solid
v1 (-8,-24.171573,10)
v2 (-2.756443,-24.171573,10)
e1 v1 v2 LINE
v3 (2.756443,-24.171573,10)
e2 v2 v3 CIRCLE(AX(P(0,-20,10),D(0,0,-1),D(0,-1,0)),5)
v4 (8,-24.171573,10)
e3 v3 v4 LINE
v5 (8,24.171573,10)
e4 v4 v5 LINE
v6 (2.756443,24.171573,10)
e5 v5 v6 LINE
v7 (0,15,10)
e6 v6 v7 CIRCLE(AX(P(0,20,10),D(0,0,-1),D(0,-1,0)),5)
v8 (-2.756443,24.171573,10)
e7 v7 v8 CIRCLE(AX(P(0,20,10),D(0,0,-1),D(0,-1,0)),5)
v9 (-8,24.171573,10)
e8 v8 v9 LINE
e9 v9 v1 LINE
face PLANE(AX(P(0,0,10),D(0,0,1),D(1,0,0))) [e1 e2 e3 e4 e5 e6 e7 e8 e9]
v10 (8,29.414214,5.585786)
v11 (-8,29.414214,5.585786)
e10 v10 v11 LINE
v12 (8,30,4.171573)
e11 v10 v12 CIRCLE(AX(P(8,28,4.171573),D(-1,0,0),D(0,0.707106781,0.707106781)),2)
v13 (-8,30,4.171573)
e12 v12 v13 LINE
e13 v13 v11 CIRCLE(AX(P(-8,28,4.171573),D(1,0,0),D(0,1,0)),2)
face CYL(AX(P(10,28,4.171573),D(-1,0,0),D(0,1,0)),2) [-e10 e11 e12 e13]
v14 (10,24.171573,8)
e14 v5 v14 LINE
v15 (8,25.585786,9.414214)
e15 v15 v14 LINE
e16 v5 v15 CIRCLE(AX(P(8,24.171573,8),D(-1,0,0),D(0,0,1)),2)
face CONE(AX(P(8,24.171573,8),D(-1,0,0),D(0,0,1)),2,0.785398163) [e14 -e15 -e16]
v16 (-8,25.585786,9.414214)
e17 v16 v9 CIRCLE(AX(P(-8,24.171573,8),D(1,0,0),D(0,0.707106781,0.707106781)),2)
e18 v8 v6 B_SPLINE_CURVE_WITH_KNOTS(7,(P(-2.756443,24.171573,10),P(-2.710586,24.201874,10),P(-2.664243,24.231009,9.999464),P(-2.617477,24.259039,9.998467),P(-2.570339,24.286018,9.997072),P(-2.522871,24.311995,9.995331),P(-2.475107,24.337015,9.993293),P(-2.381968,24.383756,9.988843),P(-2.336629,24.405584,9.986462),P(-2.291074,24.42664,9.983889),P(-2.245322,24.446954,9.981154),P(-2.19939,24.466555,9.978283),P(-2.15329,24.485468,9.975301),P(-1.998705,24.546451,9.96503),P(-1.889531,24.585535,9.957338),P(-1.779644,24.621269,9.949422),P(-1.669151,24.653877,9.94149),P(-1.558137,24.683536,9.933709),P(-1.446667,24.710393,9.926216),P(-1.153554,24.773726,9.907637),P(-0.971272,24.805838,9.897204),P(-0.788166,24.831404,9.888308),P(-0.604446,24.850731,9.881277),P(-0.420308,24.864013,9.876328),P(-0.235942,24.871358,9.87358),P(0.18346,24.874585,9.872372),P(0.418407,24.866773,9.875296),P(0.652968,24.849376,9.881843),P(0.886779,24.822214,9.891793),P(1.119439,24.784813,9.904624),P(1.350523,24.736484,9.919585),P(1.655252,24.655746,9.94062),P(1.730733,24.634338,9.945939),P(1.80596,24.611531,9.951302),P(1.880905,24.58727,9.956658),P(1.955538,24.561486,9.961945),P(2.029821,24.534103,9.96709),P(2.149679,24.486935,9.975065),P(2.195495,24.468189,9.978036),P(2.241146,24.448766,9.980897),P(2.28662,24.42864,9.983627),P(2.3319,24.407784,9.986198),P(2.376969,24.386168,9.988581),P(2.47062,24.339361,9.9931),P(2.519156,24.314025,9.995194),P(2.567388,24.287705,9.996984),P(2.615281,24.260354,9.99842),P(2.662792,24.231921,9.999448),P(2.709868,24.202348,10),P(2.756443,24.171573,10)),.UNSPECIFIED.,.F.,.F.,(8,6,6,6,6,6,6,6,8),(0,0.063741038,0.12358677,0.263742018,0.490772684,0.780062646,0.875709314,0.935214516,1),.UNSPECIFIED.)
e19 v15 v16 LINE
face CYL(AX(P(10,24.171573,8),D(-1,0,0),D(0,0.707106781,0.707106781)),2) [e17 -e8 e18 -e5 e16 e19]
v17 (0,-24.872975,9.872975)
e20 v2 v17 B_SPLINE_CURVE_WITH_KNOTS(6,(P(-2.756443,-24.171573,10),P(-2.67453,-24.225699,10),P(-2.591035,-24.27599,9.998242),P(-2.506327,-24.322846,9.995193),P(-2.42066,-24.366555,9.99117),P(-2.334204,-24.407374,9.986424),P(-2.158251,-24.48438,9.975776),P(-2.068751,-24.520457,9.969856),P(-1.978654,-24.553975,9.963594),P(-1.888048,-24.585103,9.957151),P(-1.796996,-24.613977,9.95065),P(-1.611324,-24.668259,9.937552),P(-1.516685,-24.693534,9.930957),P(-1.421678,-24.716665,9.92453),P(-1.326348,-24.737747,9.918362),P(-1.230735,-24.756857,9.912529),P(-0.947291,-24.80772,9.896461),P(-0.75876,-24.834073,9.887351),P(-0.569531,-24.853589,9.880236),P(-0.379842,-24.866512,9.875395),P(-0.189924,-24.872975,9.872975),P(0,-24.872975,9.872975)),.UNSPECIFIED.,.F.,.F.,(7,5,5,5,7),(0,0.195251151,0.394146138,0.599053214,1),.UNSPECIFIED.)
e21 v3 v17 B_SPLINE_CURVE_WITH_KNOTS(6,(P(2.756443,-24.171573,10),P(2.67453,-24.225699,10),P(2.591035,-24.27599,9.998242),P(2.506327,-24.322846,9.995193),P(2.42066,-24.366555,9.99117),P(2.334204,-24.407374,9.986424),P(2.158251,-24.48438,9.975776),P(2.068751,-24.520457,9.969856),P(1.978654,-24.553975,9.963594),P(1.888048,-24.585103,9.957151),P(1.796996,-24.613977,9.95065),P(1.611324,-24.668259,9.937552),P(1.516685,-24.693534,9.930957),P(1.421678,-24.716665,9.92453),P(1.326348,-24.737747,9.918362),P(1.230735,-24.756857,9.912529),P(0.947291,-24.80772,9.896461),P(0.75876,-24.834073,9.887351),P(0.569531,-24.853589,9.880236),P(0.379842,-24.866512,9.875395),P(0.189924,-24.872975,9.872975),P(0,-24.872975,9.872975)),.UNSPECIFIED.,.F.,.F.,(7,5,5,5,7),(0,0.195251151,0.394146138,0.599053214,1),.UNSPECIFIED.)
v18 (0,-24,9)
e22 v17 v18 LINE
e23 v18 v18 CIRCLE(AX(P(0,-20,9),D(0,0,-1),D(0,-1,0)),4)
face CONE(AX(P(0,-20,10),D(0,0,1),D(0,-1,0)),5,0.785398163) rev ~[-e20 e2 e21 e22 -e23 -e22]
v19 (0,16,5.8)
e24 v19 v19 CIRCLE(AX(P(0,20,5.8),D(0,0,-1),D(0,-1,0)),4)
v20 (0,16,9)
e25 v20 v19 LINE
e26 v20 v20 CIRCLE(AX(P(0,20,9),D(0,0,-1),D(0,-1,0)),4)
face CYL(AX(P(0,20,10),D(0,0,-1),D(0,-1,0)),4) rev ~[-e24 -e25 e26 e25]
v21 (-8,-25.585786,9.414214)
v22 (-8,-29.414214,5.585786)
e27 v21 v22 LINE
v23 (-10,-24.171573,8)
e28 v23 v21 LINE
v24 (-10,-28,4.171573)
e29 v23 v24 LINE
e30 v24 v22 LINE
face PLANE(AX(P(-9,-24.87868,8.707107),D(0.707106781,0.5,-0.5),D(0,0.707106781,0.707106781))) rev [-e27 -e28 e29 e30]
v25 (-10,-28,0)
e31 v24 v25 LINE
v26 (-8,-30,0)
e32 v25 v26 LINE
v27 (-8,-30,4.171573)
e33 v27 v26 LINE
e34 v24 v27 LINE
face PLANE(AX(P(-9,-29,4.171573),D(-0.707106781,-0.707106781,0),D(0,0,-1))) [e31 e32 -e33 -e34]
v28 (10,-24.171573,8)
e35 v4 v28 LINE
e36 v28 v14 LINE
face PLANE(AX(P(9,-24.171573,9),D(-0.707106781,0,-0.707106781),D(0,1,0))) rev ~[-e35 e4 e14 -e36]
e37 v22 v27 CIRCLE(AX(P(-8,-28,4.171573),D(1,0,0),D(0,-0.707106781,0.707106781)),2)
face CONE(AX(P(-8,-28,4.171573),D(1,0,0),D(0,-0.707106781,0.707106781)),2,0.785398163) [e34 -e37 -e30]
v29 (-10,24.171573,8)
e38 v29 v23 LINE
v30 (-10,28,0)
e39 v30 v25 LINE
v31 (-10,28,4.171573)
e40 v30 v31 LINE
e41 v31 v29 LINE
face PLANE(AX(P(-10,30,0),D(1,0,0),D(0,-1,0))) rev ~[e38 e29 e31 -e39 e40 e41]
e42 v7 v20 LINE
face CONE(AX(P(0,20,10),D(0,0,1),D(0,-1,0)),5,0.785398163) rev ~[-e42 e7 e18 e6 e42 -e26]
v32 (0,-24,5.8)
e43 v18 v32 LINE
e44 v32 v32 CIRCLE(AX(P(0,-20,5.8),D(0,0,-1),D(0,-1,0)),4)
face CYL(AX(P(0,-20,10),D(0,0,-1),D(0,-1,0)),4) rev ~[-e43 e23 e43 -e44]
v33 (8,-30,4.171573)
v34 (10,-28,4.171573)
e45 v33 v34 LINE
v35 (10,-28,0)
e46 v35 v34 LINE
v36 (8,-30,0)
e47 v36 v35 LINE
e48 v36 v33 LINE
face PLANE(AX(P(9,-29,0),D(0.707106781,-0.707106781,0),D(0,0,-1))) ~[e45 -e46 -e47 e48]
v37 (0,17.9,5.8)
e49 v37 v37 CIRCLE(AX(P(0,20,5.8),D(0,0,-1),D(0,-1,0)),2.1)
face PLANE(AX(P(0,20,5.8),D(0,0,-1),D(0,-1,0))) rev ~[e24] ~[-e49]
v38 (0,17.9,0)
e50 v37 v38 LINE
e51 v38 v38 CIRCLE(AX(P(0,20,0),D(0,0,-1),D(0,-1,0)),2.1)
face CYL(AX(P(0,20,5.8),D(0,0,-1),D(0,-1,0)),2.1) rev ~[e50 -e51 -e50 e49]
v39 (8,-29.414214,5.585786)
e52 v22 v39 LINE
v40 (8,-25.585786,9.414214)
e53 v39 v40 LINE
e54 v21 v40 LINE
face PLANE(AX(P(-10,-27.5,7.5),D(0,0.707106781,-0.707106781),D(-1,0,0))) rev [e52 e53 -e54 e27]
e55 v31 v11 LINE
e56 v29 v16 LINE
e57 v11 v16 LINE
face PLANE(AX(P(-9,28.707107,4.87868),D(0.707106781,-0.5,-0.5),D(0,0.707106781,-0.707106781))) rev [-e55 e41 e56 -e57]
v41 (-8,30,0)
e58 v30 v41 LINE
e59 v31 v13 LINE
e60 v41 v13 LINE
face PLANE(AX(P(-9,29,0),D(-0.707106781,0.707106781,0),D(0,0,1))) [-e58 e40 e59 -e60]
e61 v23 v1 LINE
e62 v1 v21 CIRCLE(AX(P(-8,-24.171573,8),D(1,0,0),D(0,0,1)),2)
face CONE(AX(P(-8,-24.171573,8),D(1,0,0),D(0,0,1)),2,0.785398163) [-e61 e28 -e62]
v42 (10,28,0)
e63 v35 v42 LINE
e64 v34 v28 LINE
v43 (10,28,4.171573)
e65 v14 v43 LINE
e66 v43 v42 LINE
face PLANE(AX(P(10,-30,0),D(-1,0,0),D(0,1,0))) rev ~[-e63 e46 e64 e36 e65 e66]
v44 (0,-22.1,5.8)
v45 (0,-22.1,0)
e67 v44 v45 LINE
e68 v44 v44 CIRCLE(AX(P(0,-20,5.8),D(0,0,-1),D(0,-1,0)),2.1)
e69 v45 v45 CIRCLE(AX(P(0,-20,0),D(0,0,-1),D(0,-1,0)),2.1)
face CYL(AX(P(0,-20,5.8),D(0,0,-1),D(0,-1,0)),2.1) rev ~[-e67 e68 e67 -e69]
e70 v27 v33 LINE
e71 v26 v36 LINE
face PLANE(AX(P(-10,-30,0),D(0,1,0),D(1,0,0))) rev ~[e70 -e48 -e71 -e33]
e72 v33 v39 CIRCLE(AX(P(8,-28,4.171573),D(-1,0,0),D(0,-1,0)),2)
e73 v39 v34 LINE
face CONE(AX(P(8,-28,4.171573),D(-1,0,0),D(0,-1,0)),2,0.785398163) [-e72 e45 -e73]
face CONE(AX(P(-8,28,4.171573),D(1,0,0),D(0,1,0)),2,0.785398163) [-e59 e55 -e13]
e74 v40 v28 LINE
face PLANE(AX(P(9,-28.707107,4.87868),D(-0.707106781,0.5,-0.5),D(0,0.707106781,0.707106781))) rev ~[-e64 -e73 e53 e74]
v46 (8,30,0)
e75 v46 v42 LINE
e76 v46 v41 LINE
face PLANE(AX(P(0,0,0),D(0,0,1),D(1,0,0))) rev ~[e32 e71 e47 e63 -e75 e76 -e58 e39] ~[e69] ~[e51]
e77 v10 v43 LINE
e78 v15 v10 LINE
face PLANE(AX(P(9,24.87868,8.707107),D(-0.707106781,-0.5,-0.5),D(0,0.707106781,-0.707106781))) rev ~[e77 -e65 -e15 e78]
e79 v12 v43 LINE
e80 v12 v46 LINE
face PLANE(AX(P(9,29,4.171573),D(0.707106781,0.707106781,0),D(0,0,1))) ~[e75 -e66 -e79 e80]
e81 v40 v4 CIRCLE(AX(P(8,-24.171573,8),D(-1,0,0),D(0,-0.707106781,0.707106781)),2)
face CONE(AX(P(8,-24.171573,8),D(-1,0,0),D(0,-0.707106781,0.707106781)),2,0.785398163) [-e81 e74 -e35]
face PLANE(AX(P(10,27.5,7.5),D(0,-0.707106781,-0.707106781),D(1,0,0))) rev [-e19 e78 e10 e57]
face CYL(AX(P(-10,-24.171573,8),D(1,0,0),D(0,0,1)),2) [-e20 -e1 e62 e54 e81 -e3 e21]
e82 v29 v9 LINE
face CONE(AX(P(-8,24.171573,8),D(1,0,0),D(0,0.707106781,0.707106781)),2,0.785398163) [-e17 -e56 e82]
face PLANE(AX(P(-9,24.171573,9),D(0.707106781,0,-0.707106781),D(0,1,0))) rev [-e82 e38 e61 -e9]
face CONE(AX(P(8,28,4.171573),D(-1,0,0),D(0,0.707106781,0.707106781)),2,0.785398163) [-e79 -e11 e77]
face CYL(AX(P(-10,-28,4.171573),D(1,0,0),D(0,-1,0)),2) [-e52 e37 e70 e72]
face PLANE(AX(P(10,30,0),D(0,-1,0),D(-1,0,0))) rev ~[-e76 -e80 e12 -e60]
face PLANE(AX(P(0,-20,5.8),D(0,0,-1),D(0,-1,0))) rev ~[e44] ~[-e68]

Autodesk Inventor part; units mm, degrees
ref_plane "YZ Plane" through (0, 0, 0) normal (1, 0, 0) x (0, 1, 0)
ref_plane "XZ Plane" through (0, 0, 0) normal (0, 1, 0) x (-1, 0, 0)
ref_plane "XY Plane" through (0, 0, 0) normal (0, 0, 1) x (1, 0, 0)
sketch "スケッチ1" plane through (0, 0, 0) normal (0, 0, 1) x (1, 0, 0)
  line L0 (-10, -30) -> (10, -30)
  line L1 (10, -30) -> (10, 30)
  line L2 (10, 30) -> (-10, 30)
  line L3 (-10, 30) -> (-10, -30)
  line L4 (-10, -30) -> (10, 30) construction
  line L5 (10, -30) -> (-10, 30) construction
  point P0 (0, 0)
  dimension "d0" = 20
  dimension "d1" = 60
extrude "押し出し1" add sketch "スケッチ1" along normal blind 10
chamfer "面取り1" distance 5 angle 45 2 edges at (0, 30, 10) (0, -30, 10)
fillet "フィレット1" radius 2 4 edges at (0, 30, 5) (0, 25, 10) (0, -25, 10) (0, -30, 5)
chamfer "面取り2" distance 2 angle 45 18 edges at (10, 0, 10) (10, 24.9369, 9.8478) (10, 27.5, 7.5) (10, 29.8478, 4.9369) (10, 30, 2.0858) (10, -24.9369, 9.8478) (10, -27.5, 7.5) (10, -29.8478, 4.9369) (10, -30, 2.0858) (-10, 0, 10) (-10, -24.9369, 9.8478) (-10, -27.5, 7.5) (-10, -29.8478, 4.9369) (-10, -30, 2.0858) (-10, 24.9369, 9.8478) (-10, 27.5, 7.5) (-10, 29.8478, 4.9369) (-10, 30, 2.0858)
sketch "スケッチ2" plane through (0, 0, 10) normal (0, 0, 1) x (1, 0, 0)
  line L0 (-8, -24.1716) -> (-8, 24.1716) projected
  line L1 (8, -24.1716) -> (-8, -24.1716) projected
  line L2 (8, 24.1716) -> (8, -24.1716) projected
  line L3 (-8, 24.1716) -> (8, 24.1716) projected
  point P0 (0, 0)
  point P1 (0, 20)
  point P2 (0, -20)
  dimension "d11" = 40
  dimension "d12" = 20
hole "穴1" at (0, 20, 10) at (0, -20, 10) direction (0, 0, -1) diameter 4.2 depth 21.5 counterbore diameter 8 counterbore depth 4.2
chamfer "面取り3" distance 1 angle 45 2 edges at (0, 24, 10) (0, -16, 10)
equation "\"d12\" = 0.5 * d11"
properties part number "Flame_Cover_A"
